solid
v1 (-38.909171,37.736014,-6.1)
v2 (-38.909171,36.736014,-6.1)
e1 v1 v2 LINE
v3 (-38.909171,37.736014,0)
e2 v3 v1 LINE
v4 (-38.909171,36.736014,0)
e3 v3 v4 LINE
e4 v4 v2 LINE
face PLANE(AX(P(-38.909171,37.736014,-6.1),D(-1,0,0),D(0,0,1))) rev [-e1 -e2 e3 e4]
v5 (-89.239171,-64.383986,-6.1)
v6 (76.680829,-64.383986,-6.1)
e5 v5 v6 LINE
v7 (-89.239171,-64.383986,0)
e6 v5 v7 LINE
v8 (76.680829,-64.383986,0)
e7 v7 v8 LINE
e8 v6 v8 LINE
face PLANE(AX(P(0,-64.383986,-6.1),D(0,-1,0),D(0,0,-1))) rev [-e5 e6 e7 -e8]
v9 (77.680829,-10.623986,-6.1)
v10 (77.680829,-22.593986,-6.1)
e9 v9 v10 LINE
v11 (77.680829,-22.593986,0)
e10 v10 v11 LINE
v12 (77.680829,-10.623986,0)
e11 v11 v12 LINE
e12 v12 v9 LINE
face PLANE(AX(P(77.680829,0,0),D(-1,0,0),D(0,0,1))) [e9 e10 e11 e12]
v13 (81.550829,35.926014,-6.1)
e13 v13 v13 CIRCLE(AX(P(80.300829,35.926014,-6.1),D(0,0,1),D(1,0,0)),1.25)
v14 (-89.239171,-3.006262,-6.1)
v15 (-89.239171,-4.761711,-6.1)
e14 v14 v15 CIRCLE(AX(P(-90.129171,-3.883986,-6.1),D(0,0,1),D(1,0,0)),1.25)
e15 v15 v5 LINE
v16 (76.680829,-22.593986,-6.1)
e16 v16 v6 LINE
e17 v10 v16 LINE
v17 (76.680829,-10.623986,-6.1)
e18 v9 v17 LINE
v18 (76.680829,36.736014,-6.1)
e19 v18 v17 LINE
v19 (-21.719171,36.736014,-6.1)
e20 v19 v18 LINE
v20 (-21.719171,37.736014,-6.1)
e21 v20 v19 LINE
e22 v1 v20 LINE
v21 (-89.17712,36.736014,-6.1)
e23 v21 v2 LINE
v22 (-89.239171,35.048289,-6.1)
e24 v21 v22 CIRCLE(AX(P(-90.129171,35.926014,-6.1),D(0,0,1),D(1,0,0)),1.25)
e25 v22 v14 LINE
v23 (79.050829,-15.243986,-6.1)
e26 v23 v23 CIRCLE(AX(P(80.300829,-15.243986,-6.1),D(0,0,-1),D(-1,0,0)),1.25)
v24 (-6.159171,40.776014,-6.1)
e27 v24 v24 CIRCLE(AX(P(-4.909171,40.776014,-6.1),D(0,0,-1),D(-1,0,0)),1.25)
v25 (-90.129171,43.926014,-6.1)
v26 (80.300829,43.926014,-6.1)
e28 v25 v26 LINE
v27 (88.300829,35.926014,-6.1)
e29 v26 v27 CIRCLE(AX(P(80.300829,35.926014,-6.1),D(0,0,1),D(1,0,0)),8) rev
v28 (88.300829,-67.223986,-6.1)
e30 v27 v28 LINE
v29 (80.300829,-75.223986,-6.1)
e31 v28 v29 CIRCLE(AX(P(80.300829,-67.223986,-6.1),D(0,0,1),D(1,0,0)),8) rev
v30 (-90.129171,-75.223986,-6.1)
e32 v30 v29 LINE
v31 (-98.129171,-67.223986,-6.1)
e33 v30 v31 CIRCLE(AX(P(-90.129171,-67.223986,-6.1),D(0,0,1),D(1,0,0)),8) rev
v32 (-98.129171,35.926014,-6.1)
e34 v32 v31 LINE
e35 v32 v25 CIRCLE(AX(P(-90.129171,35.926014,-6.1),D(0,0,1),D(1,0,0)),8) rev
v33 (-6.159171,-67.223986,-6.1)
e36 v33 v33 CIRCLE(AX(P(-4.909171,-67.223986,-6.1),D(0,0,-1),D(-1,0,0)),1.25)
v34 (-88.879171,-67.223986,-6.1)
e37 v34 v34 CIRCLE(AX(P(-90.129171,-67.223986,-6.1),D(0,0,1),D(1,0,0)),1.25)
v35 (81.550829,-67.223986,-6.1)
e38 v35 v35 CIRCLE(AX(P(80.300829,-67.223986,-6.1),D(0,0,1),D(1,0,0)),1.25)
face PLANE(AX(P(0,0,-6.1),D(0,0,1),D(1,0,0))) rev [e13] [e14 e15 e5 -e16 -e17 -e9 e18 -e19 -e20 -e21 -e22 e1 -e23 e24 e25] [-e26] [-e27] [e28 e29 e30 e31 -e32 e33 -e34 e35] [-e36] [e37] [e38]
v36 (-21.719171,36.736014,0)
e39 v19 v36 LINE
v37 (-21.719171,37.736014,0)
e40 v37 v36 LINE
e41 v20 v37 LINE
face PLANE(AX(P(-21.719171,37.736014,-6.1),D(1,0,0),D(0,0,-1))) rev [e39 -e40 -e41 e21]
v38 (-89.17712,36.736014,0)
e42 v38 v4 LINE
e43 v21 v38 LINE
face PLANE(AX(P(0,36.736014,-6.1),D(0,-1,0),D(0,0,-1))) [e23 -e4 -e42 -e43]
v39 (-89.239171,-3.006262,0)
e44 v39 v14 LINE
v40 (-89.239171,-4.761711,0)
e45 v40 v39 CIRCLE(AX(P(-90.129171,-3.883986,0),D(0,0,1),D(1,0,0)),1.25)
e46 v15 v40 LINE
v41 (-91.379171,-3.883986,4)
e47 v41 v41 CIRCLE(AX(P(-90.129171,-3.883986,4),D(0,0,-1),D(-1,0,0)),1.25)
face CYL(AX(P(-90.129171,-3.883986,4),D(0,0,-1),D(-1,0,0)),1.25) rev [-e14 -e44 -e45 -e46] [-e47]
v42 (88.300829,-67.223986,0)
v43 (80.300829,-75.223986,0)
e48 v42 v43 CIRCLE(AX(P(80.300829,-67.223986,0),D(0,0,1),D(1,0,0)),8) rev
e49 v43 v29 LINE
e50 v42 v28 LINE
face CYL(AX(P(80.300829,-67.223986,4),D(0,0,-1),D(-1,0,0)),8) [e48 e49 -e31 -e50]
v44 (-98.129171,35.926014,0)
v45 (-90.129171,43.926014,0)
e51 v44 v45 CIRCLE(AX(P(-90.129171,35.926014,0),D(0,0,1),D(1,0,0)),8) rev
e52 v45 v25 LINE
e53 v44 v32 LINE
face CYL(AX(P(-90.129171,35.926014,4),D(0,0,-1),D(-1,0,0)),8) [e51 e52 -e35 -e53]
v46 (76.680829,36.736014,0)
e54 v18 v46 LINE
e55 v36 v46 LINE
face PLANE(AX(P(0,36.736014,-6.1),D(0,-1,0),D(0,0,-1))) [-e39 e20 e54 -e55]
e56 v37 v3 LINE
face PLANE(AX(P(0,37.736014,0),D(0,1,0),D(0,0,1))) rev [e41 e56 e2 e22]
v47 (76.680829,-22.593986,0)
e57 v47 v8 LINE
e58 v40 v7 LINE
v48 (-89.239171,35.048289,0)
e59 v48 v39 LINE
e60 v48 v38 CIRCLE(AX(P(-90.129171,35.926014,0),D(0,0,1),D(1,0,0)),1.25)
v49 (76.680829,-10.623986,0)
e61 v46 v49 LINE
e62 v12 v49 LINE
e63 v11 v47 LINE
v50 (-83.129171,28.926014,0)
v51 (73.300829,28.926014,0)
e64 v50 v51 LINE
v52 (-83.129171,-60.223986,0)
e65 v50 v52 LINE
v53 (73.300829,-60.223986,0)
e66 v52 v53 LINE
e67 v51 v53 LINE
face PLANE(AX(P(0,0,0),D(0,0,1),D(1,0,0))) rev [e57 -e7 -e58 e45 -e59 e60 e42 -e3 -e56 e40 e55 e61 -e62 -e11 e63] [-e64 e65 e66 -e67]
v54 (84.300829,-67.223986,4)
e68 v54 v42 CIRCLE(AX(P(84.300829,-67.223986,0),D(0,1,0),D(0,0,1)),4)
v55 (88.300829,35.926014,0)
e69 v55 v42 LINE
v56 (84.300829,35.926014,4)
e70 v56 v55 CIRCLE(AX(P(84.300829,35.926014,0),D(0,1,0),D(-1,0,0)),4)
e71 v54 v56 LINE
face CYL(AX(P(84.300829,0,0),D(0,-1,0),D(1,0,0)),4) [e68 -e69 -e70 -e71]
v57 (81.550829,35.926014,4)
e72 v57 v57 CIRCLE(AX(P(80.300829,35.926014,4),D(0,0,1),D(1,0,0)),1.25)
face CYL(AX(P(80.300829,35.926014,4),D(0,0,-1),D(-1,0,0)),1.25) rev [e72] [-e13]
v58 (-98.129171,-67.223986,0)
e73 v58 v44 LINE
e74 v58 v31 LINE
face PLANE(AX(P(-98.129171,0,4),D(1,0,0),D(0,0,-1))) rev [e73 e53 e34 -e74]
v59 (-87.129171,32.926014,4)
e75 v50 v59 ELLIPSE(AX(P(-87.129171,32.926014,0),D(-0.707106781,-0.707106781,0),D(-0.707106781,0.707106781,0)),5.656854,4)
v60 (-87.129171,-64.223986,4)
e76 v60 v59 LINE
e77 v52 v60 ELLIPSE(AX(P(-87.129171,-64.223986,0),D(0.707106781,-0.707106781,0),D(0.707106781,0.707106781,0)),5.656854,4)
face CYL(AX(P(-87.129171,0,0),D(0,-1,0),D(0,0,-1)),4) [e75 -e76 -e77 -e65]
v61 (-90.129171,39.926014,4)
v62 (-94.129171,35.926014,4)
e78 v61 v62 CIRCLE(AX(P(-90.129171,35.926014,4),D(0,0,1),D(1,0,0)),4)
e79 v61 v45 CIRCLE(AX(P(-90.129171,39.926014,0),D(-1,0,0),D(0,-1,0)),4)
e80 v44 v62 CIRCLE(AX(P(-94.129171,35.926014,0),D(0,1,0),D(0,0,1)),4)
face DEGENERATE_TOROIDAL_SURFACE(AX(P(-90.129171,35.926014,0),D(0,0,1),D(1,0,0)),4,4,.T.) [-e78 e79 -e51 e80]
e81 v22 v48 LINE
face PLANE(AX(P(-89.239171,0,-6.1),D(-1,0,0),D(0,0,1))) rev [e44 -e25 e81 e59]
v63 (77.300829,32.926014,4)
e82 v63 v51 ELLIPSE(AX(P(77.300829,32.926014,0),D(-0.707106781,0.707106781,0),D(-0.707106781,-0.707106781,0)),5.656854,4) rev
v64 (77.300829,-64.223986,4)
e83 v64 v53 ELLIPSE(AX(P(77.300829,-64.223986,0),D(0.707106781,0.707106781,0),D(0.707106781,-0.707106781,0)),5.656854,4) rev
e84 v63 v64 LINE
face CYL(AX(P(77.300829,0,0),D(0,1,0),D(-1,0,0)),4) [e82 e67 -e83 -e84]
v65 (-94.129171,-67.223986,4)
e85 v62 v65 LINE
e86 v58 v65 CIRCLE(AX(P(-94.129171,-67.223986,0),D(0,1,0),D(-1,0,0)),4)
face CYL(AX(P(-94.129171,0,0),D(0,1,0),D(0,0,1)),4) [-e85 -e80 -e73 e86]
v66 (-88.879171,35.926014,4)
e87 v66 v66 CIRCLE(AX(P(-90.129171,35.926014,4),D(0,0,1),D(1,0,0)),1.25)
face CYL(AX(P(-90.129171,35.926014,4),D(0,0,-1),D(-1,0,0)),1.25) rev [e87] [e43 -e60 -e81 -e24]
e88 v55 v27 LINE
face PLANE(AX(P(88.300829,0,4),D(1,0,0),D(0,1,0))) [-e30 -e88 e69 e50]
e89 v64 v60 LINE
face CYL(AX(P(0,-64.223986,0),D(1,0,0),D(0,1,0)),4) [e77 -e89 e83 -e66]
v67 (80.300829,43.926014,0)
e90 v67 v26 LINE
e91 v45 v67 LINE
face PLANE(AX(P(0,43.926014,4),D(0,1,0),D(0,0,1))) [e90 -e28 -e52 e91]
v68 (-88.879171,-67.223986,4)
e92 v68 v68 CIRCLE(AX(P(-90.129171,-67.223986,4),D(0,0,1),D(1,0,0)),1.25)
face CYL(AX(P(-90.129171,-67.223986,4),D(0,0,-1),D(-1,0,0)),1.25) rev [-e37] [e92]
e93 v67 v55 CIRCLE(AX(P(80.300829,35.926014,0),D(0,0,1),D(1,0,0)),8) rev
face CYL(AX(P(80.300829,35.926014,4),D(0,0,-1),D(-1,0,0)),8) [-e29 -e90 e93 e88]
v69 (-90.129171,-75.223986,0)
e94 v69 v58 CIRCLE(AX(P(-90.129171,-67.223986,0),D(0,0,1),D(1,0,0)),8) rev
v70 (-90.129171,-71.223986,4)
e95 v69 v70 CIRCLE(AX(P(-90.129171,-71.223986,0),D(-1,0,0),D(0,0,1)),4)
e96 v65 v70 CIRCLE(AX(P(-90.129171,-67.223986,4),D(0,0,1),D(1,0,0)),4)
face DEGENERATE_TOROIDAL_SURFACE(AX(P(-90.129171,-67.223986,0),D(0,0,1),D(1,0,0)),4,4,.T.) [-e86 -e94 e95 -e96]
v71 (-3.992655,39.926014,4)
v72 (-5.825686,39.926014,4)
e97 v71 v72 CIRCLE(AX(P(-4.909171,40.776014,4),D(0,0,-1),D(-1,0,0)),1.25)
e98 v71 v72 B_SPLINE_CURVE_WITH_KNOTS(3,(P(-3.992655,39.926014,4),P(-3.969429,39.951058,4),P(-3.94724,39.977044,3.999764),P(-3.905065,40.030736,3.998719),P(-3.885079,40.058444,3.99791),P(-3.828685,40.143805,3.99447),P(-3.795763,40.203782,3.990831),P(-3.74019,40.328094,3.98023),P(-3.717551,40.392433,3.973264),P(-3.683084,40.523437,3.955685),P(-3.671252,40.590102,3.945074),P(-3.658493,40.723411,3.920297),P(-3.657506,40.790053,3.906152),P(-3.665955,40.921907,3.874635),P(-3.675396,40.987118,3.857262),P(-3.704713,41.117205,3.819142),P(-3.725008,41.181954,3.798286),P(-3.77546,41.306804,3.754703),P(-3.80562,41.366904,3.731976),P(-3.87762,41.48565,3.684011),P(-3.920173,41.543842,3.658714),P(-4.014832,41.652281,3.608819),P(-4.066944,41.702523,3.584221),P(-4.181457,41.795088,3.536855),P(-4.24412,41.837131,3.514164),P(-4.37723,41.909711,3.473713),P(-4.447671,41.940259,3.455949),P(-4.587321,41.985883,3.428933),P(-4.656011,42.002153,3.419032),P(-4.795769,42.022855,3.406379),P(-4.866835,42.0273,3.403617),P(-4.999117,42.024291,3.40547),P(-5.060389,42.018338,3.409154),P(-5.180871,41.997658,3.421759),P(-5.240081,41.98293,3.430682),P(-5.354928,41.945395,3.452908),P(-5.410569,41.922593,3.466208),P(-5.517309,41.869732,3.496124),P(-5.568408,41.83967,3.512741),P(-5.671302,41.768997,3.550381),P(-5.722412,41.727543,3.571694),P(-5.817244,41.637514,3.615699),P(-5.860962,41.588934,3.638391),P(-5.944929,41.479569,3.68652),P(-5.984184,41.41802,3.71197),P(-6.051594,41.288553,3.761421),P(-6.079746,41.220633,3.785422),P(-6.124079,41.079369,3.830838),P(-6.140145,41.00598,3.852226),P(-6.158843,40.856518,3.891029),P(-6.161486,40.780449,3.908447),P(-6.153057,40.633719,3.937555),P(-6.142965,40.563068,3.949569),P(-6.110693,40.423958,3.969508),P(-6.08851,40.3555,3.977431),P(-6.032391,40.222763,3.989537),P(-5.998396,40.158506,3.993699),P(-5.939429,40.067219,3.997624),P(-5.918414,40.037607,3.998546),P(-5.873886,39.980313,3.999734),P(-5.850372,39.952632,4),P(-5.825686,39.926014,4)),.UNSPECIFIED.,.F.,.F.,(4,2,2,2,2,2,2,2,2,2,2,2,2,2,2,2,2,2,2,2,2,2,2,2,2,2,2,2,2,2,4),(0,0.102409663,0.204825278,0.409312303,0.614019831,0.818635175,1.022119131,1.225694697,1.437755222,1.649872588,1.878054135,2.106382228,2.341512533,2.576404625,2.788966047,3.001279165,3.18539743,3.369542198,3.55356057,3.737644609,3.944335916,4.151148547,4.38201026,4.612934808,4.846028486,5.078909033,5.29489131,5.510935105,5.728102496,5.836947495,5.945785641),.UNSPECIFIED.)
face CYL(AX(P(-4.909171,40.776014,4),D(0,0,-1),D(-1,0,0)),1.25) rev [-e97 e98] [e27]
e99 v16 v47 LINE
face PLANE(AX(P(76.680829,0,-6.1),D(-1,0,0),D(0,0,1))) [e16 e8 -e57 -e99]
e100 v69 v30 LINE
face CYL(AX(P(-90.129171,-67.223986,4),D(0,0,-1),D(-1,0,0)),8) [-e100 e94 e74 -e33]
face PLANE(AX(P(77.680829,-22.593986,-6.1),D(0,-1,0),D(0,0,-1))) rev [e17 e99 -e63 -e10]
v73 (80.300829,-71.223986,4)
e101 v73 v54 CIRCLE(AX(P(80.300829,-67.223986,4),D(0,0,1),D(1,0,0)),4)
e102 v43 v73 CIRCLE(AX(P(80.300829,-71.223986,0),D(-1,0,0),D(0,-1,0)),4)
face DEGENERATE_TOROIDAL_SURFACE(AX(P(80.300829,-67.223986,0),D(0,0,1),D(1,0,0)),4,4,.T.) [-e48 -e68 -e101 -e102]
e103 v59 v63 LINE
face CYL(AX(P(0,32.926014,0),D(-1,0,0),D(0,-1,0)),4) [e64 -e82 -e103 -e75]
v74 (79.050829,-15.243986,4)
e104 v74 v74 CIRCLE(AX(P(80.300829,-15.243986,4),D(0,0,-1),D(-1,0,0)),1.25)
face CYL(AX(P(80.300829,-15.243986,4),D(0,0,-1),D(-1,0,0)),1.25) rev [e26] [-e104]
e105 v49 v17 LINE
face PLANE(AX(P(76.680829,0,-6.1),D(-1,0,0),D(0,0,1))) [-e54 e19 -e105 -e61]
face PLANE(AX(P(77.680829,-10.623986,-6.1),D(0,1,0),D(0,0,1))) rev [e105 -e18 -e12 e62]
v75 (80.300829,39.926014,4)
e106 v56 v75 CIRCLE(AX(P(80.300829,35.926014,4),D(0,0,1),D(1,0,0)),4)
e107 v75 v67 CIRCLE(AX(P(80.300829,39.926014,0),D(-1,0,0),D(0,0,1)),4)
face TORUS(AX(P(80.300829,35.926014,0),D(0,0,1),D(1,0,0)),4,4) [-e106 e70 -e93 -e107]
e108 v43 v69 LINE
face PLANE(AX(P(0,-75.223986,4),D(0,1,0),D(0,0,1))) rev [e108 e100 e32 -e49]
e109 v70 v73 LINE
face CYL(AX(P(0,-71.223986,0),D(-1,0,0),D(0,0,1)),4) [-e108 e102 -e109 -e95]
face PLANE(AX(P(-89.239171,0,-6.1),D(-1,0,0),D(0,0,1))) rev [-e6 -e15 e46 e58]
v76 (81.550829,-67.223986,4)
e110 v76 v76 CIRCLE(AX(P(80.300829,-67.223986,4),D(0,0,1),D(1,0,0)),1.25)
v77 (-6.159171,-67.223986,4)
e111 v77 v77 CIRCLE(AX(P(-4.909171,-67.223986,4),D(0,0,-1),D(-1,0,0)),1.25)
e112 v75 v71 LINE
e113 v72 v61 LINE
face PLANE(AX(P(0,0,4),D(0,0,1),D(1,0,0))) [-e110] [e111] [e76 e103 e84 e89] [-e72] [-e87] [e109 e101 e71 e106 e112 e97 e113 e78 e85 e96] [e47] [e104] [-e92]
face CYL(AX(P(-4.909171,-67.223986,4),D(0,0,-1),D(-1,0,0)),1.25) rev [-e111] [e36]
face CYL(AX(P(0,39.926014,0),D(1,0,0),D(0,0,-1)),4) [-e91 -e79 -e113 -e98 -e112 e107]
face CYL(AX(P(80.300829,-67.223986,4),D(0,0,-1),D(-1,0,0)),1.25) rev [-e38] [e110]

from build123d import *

# Parameters (mm, degrees)
SKETCH1_R           = 1.25
SKETCH1_W           = 156.43
SKETCH1_H           = 89.15
BOSS_EXTRUDE1_DEPTH = 4
BOSS_EXTRUDE2_START = -6.1
SKETCH1_3_R         = 1.25
BOSS_EXTRUDE2_DEPTH = 6.1
FILLET1_R           = 4
SKETCH2_W           = 17.19
SKETCH2_H           = 6.1
CUT_EXTRUDE1_DEPTH  = 1
SKETCH3_W           = 6.1
SKETCH3_H           = 11.97
CUT_EXTRUDE2_DEPTH  = 1
SKETCH4_R           = 1.25
CUT_EXTRUDE3_DEPTH  = 125.056407333


with BuildPart() as part:
    # Sketch1 → Boss-Extrude1 (new body)
    with BuildSketch(Plane.XY):
        with BuildLine():
            Line((-98.129170507, 35.926013825), (-98.129170507, -67.223986175))
            ThreePointArc((-98.129170507, -67.223986175), (-95.786024756, -72.880840425), (-90.129170507, -75.223986175))
            Line((-90.129170507, -75.223986175), (80.300829493, -75.223986175))
            ThreePointArc((80.300829493, -75.223986175), (85.957683743, -72.880840425), (88.300829493, -67.223986175))
            Line((88.300829493, -67.223986175), (88.300829493, 35.926013825))
            ThreePointArc((88.300829493, 35.926013825), (85.957683743, 41.582868074), (80.300829493, 43.926013825))
            Line((80.300829493, 43.926013825), (-90.129170507, 43.926013825))
            ThreePointArc((-90.129170507, 43.926013825), (-95.786024756, 41.582868074), (-98.129170507, 35.926013825))
        make_face()
        with Locations((80.300829493, 35.926013825)):
            Circle(SKETCH1_R, mode=Mode.SUBTRACT)
        with Locations((80.300829493, -67.223986175)):
            Circle(SKETCH1_R, mode=Mode.SUBTRACT)
        with Locations((-90.129170507, -67.223986175)):
            Circle(SKETCH1_R, mode=Mode.SUBTRACT)
        with Locations((-90.129170507, 35.926013825)):
            Circle(SKETCH1_R, mode=Mode.SUBTRACT)
        with Locations((-4.914170507, -15.648986175)):
            Rectangle(SKETCH1_W, SKETCH1_H, mode=Mode.SUBTRACT)
    extrude(amount=BOSS_EXTRUDE1_DEPTH)

    # Sketch1<3> → Boss-Extrude2 (add)
    with BuildSketch(Plane.XY.offset(BOSS_EXTRUDE2_START)):
        with BuildLine():
            ThreePointArc((-90.129170507, 43.926013825), (-95.786024756, 41.582868074), (-98.129170507, 35.926013825))
            Line((-98.129170507, 35.926013825), (-98.129170507, -67.223986175))
            ThreePointArc((-98.129170507, -67.223986175), (-95.786024756, -72.880840425), (-90.129170507, -75.223986175))
            Line((-90.129170507, -75.223986175), (80.300829493, -75.223986175))
            ThreePointArc((80.300829493, -75.223986175), (85.957683743, -72.880840425), (88.300829493, -67.223986175))
            Line((88.300829493, -67.223986175), (88.300829493, 35.926013825))
            ThreePointArc((88.300829493, 35.926013825), (85.957683743, 41.582868074), (80.300829493, 43.926013825))
            Line((80.300829493, 43.926013825), (-90.129170507, 43.926013825))
        make_face()
        with Locations((-90.129170507, -67.223986175)):
            Circle(SKETCH1_3_R, mode=Mode.SUBTRACT)
        with Locations((80.300829493, -67.223986175)):
            Circle(SKETCH1_3_R, mode=Mode.SUBTRACT)
        with BuildLine():
            Line((-89.239170507, -64.383986175), (-89.239170507, 35.048289495))
            ThreePointArc((-89.239170507, 35.048289495), (-91.378326538, 35.97193996), (-89.177120088, 36.736013825))
            Line((-89.177120088, 36.736013825), (76.680829493, 36.736013825))
            Line((76.680829493, 36.736013825), (76.680829493, -64.383986175))
            Line((76.680829493, -64.383986175), (-89.239170507, -64.383986175))
        make_face(mode=Mode.SUBTRACT)
        with Locations((80.300829493, 35.926013825)):
            Circle(SKETCH1_3_R, mode=Mode.SUBTRACT)
    extrude(amount=BOSS_EXTRUDE2_DEPTH)

    # Fillet1
    fillet1_edges = [part.edges().sort_by_distance(p)[0] for p in [
        (-95.786024756, 41.582868074, 4),
        (-4.914170507, 43.926013825, 4),
        (85.957683743, 41.582868074, 4),
        (88.300829493, -15.648986175, 4),
        (85.957683743, -72.880840425, 4),
        (-4.914170507, -75.223986175, 4),
        (-95.786024756, -72.880840425, 4),
        (-4.914170507, -60.223986175, 4),
        (-4.914170507, 28.926013825, 4),
        (-83.129170507, -15.648986175, 4),
        (73.300829493, -15.648986175, 4),
        (-98.129170507, -15.648986175, 4),
    ]]
    fillet(fillet1_edges, radius=FILLET1_R - 0.0001)  # a hair under: the kernel refuses the full size

    # Sketch2 → Cut-Extrude1 (cut)
    with BuildSketch(Plane.XZ.offset(-36.736013825)):
        with Locations((-30.314170507, -3.05)):
            Rectangle(SKETCH2_W, SKETCH2_H)
    extrude(amount=-CUT_EXTRUDE1_DEPTH, mode=Mode.SUBTRACT)

    # Sketch3 → Cut-Extrude2 (cut)
    with BuildSketch(Plane.ZY.offset(-76.680829493)):
        with Locations((-3.05, -16.608986175)):
            Rectangle(SKETCH3_W, SKETCH3_H)
    extrude(amount=-CUT_EXTRUDE2_DEPTH, mode=Mode.SUBTRACT)

    # Sketch4 → Cut-Extrude3 (cut, through all)
    with BuildSketch(Plane(origin=(0, 0, -6.1), x_dir=(-1, 0, 0), z_dir=(0, 0, -1))):
        with Locations((4.909170507, 40.776013825)):
            Circle(SKETCH4_R)
        with Locations((-80.300829493, -15.243986175)):
            Circle(SKETCH4_R)
        with Locations((4.909170507, -67.223986175)):
            Circle(SKETCH4_R)
        with Locations((90.129170507, -3.883986175)):
            Circle(SKETCH4_R)
    extrude(amount=-CUT_EXTRUDE3_DEPTH, mode=Mode.SUBTRACT)


solid = part.part
